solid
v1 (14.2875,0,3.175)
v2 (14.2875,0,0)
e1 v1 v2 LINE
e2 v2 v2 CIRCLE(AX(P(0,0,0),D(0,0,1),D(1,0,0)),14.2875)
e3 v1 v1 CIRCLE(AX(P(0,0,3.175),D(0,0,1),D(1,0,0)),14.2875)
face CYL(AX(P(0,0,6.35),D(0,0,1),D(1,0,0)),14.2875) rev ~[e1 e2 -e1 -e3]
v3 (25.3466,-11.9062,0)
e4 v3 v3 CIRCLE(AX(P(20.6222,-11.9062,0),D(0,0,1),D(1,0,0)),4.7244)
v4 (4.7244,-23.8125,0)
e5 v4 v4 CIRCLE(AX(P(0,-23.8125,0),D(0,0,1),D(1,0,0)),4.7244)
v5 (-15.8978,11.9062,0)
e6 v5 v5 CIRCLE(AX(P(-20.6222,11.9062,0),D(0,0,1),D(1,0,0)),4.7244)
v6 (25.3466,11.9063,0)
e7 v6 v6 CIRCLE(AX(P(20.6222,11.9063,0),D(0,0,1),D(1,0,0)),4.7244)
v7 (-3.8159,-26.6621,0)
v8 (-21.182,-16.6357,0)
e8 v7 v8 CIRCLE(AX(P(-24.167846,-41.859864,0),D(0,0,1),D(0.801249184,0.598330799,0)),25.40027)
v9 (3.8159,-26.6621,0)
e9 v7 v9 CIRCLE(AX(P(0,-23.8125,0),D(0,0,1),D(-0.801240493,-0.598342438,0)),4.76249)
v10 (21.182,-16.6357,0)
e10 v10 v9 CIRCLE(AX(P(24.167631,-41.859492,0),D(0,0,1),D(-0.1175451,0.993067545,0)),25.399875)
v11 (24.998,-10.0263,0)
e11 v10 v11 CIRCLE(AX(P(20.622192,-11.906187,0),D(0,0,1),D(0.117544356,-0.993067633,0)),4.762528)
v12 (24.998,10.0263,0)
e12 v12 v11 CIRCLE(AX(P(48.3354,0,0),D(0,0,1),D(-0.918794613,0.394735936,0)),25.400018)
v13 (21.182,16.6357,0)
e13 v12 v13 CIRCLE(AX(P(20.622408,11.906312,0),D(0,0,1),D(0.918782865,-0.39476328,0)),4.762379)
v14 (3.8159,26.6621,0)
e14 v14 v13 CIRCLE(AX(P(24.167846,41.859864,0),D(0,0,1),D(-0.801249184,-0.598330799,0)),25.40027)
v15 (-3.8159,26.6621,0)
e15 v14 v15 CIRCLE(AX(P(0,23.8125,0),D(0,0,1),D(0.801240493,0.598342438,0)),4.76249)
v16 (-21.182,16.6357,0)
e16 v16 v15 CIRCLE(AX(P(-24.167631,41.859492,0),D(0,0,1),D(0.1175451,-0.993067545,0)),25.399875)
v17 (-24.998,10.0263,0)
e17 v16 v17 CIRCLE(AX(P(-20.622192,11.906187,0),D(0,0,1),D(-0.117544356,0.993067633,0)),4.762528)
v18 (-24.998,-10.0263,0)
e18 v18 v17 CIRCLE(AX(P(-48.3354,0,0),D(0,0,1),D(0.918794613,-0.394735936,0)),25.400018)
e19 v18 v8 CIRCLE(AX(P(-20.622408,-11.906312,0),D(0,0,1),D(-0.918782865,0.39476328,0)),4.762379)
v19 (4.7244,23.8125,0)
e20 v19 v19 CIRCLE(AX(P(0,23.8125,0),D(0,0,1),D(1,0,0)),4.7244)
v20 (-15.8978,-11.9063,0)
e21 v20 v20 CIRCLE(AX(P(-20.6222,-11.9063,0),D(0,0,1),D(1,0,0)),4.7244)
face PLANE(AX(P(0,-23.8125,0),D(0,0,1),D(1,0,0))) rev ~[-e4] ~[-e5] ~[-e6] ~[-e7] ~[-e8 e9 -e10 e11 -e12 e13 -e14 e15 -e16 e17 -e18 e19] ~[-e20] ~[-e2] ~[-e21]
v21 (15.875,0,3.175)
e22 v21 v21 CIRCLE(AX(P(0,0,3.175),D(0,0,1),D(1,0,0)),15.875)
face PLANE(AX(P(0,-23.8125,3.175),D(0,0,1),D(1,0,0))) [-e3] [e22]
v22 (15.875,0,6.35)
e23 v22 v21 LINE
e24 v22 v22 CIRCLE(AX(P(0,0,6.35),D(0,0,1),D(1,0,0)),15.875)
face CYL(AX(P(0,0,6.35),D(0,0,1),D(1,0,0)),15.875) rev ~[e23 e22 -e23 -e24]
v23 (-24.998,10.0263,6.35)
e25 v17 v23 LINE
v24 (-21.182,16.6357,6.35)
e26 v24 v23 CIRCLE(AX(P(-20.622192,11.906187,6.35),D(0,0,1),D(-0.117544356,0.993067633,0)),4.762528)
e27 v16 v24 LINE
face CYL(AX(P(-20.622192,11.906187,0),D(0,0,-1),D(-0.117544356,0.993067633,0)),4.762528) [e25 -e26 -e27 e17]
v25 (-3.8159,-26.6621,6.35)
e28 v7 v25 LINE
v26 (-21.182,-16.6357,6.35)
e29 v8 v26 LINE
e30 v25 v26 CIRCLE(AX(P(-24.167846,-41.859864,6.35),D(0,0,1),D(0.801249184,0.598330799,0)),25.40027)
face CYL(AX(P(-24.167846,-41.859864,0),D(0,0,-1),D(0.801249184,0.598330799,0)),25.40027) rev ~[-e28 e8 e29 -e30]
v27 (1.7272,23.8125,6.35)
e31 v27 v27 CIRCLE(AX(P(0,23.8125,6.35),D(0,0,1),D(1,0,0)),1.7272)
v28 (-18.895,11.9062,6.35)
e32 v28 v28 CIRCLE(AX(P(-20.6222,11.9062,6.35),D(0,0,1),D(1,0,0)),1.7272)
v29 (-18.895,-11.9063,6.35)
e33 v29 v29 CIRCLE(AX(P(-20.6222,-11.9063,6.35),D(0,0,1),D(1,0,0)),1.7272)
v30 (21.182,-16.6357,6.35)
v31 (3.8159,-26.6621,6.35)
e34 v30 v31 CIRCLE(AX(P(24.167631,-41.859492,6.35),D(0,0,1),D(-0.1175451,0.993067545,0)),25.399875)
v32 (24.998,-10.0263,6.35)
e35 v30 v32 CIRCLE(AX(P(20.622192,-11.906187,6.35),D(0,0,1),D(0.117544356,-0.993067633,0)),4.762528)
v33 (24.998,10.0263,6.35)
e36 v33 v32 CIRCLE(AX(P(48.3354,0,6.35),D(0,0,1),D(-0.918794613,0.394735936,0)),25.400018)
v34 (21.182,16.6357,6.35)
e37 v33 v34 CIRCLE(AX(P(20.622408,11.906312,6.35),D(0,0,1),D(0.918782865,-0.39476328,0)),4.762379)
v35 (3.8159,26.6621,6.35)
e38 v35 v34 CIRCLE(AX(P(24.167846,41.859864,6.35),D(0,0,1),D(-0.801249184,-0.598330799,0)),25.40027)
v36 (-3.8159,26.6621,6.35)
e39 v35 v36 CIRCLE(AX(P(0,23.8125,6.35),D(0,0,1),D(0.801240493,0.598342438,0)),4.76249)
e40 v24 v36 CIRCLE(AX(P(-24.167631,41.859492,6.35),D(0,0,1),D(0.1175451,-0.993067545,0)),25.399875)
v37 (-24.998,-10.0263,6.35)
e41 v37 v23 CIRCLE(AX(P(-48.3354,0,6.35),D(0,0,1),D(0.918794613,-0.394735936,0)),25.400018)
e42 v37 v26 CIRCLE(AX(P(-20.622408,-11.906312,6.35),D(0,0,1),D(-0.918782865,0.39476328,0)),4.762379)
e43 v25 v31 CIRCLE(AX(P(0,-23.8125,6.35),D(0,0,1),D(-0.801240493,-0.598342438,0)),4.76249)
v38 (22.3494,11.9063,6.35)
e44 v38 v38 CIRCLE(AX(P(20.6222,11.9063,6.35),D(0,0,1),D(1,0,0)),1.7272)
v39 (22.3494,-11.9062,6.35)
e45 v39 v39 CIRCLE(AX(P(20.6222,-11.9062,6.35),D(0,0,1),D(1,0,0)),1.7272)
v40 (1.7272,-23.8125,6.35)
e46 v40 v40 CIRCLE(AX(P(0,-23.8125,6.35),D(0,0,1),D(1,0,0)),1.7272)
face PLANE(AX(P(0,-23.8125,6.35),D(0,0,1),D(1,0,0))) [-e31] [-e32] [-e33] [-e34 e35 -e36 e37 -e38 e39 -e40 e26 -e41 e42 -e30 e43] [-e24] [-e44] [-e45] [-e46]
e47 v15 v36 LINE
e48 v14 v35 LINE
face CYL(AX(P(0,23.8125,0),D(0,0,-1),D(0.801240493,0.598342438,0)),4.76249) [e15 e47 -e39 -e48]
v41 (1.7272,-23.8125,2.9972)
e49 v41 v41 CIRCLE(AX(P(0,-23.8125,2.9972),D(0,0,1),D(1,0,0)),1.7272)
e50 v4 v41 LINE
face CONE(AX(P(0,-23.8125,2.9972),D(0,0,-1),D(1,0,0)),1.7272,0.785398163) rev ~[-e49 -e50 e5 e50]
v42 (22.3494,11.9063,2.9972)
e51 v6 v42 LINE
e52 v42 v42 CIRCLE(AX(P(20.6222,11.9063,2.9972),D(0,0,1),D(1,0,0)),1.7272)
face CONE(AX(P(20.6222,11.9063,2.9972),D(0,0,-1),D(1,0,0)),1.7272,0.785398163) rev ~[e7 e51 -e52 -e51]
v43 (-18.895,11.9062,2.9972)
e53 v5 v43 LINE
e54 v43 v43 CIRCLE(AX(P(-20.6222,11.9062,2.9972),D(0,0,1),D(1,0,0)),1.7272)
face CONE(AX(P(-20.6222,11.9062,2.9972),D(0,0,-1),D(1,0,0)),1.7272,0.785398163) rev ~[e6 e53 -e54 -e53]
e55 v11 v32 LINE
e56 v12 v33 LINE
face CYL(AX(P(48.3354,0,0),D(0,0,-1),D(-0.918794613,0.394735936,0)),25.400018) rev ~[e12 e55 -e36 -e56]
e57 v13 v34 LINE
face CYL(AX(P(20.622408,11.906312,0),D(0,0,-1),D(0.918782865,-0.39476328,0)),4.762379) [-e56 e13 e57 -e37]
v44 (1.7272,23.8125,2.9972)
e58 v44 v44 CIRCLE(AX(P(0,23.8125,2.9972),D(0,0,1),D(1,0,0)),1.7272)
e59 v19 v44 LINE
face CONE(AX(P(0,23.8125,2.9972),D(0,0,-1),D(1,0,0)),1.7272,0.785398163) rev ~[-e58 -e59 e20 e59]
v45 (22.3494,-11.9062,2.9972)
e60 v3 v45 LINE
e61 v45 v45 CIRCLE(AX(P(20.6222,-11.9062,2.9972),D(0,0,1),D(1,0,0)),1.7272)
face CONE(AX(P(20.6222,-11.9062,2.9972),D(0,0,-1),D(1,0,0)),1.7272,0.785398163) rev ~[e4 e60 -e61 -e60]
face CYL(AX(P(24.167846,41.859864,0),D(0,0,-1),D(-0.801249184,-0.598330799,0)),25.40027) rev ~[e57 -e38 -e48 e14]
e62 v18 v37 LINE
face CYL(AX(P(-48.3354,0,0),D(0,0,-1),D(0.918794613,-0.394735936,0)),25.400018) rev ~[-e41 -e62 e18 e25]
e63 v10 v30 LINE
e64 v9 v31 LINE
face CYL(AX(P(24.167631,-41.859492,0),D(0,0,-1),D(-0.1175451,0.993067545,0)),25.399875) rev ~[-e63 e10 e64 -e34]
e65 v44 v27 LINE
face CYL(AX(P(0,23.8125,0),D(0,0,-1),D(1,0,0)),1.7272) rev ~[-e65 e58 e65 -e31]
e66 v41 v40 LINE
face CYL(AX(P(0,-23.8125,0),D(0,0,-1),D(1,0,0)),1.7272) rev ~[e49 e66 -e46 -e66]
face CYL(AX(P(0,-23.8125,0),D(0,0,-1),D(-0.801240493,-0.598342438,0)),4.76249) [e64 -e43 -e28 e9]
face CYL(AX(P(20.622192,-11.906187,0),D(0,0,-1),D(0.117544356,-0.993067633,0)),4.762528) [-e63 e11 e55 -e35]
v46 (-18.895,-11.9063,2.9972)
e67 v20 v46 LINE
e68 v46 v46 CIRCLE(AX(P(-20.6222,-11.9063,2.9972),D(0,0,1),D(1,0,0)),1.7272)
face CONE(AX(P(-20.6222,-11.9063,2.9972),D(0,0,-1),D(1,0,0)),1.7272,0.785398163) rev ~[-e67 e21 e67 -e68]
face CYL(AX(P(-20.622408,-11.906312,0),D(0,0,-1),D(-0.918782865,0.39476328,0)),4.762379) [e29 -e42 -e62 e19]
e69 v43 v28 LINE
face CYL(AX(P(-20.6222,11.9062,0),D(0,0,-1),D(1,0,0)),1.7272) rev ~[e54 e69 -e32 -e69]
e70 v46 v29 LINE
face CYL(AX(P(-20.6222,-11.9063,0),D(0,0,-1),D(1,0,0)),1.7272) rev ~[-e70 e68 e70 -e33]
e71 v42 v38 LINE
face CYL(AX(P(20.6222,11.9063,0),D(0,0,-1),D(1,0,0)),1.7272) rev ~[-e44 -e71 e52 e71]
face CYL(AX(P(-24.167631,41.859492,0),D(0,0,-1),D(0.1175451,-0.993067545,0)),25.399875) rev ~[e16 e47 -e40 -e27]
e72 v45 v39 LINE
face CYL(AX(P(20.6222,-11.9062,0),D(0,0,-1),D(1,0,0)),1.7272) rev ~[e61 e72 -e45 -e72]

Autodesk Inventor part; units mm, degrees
ref_plane "YZ Plane" through (0, 0, 0) normal (1, 0, 0) x (0, 1, 0)
ref_plane "XZ Plane" through (0, 0, 0) normal (0, 1, 0) x (-1, 0, 0)
ref_plane "XY Plane" through (0, 0, 0) normal (0, 0, 1) x (1, 0, 0)
surface "Composite1"
sketch "Sketch2" plane through (0, -23.8125, 0) normal (0, 0, 1) x (1, 0, 0)
  arc A0 (3.8159, 50.4746) -> (21.182, 40.4482) centre (24.1677, 65.6722) ccw projected
  arc A1 (3.8159, 50.4746) -> (-3.8159, 50.4746) centre (0, 47.625) ccw projected
  arc A2 (-21.182, 40.4482) -> (-3.8159, 50.4746) centre (-24.1677, 65.6722) ccw projected
  arc A3 (-21.182, 40.4482) -> (-24.998, 33.8388) centre (-20.6222, 35.7187) ccw projected
  arc A4 (-24.998, 13.7862) -> (-24.998, 33.8388) centre (-48.3354, 23.8125) ccw projected
  arc A5 (-24.998, 13.7862) -> (-21.182, 7.1768) centre (-20.6222, 11.9062) ccw projected
  arc A6 (-3.8159, -2.8496) -> (-21.182, 7.1768) centre (-24.1677, -18.0472) ccw projected
  arc A7 (-3.8159, -2.8496) -> (3.8159, -2.8496) centre (0, 0) ccw projected
  arc A8 (21.182, 7.1768) -> (3.8159, -2.8496) centre (24.1677, -18.0472) ccw projected
  arc A9 (21.182, 7.1768) -> (24.998, 13.7862) centre (20.6222, 11.9063) ccw projected
  arc A10 (24.998, 33.8388) -> (24.998, 13.7862) centre (48.3354, 23.8125) ccw projected
  arc A11 (24.998, 33.8388) -> (21.182, 40.4482) centre (20.6222, 35.7188) ccw projected
  circle A12 centre (0, 47.625) radius 1.7272 projected
  circle A13 centre (20.6222, 35.7188) radius 1.7272 projected
  circle A14 centre (20.6222, 11.9063) radius 1.7272 projected
  circle A15 centre (0, 0) radius 1.7272 projected
  circle A16 centre (-20.6222, 11.9062) radius 1.7272 projected
  circle A17 centre (-20.6222, 35.7187) radius 1.7272 projected
  arc A18 (14.2875, 23.8125) -> (-14.2875, 23.8125) centre (0, 23.8125) ccw projected
  arc A19 (-14.2875, 23.8125) -> (14.2875, 23.8125) centre (0, 23.8125) ccw projected
  circle A20 centre (0, 23.8125) radius 12.7 projected
extrude "Extrusion1" add sketch "Sketch2" along normal blind 6.35 contours A0 A11 A10 A9 A8 A7 A6 A5 A4 A3 A2 A1
extrude "Extrusion2" add sketch "Sketch2" along normal blind 3.175 contours A19 A18
sketch "Sketch3" plane through (0, -23.8125, 6.35) normal (0, 0, 1) x (1, 0, 0)
  circle A0 centre (0, 23.8125) radius 14.2875 projected
  circle A1 centre (0, 23.8125) radius 15.875
  circle A2 centre (0, 23.8125) radius 12.7 projected
  dimension "d4" = 31.75
extrude "Extrusion3" cut sketch "Sketch3" against normal blind 3.175 contours A1
extrude "Extrusion4" cut sketch "Sketch3" against normal through all contours A0
chamfer "Chamfer1" distance 2.9972 angle 45 6 edges at (18.895, 11.9063, 0) (-1.7272, 23.8125, 0) (-22.3494, 11.9063, 0) (-22.3494, -11.9062, 0) (-1.7272, -23.8125, 0) (18.895, -11.9062, 0)
properties part number "lower box bolt plate"
